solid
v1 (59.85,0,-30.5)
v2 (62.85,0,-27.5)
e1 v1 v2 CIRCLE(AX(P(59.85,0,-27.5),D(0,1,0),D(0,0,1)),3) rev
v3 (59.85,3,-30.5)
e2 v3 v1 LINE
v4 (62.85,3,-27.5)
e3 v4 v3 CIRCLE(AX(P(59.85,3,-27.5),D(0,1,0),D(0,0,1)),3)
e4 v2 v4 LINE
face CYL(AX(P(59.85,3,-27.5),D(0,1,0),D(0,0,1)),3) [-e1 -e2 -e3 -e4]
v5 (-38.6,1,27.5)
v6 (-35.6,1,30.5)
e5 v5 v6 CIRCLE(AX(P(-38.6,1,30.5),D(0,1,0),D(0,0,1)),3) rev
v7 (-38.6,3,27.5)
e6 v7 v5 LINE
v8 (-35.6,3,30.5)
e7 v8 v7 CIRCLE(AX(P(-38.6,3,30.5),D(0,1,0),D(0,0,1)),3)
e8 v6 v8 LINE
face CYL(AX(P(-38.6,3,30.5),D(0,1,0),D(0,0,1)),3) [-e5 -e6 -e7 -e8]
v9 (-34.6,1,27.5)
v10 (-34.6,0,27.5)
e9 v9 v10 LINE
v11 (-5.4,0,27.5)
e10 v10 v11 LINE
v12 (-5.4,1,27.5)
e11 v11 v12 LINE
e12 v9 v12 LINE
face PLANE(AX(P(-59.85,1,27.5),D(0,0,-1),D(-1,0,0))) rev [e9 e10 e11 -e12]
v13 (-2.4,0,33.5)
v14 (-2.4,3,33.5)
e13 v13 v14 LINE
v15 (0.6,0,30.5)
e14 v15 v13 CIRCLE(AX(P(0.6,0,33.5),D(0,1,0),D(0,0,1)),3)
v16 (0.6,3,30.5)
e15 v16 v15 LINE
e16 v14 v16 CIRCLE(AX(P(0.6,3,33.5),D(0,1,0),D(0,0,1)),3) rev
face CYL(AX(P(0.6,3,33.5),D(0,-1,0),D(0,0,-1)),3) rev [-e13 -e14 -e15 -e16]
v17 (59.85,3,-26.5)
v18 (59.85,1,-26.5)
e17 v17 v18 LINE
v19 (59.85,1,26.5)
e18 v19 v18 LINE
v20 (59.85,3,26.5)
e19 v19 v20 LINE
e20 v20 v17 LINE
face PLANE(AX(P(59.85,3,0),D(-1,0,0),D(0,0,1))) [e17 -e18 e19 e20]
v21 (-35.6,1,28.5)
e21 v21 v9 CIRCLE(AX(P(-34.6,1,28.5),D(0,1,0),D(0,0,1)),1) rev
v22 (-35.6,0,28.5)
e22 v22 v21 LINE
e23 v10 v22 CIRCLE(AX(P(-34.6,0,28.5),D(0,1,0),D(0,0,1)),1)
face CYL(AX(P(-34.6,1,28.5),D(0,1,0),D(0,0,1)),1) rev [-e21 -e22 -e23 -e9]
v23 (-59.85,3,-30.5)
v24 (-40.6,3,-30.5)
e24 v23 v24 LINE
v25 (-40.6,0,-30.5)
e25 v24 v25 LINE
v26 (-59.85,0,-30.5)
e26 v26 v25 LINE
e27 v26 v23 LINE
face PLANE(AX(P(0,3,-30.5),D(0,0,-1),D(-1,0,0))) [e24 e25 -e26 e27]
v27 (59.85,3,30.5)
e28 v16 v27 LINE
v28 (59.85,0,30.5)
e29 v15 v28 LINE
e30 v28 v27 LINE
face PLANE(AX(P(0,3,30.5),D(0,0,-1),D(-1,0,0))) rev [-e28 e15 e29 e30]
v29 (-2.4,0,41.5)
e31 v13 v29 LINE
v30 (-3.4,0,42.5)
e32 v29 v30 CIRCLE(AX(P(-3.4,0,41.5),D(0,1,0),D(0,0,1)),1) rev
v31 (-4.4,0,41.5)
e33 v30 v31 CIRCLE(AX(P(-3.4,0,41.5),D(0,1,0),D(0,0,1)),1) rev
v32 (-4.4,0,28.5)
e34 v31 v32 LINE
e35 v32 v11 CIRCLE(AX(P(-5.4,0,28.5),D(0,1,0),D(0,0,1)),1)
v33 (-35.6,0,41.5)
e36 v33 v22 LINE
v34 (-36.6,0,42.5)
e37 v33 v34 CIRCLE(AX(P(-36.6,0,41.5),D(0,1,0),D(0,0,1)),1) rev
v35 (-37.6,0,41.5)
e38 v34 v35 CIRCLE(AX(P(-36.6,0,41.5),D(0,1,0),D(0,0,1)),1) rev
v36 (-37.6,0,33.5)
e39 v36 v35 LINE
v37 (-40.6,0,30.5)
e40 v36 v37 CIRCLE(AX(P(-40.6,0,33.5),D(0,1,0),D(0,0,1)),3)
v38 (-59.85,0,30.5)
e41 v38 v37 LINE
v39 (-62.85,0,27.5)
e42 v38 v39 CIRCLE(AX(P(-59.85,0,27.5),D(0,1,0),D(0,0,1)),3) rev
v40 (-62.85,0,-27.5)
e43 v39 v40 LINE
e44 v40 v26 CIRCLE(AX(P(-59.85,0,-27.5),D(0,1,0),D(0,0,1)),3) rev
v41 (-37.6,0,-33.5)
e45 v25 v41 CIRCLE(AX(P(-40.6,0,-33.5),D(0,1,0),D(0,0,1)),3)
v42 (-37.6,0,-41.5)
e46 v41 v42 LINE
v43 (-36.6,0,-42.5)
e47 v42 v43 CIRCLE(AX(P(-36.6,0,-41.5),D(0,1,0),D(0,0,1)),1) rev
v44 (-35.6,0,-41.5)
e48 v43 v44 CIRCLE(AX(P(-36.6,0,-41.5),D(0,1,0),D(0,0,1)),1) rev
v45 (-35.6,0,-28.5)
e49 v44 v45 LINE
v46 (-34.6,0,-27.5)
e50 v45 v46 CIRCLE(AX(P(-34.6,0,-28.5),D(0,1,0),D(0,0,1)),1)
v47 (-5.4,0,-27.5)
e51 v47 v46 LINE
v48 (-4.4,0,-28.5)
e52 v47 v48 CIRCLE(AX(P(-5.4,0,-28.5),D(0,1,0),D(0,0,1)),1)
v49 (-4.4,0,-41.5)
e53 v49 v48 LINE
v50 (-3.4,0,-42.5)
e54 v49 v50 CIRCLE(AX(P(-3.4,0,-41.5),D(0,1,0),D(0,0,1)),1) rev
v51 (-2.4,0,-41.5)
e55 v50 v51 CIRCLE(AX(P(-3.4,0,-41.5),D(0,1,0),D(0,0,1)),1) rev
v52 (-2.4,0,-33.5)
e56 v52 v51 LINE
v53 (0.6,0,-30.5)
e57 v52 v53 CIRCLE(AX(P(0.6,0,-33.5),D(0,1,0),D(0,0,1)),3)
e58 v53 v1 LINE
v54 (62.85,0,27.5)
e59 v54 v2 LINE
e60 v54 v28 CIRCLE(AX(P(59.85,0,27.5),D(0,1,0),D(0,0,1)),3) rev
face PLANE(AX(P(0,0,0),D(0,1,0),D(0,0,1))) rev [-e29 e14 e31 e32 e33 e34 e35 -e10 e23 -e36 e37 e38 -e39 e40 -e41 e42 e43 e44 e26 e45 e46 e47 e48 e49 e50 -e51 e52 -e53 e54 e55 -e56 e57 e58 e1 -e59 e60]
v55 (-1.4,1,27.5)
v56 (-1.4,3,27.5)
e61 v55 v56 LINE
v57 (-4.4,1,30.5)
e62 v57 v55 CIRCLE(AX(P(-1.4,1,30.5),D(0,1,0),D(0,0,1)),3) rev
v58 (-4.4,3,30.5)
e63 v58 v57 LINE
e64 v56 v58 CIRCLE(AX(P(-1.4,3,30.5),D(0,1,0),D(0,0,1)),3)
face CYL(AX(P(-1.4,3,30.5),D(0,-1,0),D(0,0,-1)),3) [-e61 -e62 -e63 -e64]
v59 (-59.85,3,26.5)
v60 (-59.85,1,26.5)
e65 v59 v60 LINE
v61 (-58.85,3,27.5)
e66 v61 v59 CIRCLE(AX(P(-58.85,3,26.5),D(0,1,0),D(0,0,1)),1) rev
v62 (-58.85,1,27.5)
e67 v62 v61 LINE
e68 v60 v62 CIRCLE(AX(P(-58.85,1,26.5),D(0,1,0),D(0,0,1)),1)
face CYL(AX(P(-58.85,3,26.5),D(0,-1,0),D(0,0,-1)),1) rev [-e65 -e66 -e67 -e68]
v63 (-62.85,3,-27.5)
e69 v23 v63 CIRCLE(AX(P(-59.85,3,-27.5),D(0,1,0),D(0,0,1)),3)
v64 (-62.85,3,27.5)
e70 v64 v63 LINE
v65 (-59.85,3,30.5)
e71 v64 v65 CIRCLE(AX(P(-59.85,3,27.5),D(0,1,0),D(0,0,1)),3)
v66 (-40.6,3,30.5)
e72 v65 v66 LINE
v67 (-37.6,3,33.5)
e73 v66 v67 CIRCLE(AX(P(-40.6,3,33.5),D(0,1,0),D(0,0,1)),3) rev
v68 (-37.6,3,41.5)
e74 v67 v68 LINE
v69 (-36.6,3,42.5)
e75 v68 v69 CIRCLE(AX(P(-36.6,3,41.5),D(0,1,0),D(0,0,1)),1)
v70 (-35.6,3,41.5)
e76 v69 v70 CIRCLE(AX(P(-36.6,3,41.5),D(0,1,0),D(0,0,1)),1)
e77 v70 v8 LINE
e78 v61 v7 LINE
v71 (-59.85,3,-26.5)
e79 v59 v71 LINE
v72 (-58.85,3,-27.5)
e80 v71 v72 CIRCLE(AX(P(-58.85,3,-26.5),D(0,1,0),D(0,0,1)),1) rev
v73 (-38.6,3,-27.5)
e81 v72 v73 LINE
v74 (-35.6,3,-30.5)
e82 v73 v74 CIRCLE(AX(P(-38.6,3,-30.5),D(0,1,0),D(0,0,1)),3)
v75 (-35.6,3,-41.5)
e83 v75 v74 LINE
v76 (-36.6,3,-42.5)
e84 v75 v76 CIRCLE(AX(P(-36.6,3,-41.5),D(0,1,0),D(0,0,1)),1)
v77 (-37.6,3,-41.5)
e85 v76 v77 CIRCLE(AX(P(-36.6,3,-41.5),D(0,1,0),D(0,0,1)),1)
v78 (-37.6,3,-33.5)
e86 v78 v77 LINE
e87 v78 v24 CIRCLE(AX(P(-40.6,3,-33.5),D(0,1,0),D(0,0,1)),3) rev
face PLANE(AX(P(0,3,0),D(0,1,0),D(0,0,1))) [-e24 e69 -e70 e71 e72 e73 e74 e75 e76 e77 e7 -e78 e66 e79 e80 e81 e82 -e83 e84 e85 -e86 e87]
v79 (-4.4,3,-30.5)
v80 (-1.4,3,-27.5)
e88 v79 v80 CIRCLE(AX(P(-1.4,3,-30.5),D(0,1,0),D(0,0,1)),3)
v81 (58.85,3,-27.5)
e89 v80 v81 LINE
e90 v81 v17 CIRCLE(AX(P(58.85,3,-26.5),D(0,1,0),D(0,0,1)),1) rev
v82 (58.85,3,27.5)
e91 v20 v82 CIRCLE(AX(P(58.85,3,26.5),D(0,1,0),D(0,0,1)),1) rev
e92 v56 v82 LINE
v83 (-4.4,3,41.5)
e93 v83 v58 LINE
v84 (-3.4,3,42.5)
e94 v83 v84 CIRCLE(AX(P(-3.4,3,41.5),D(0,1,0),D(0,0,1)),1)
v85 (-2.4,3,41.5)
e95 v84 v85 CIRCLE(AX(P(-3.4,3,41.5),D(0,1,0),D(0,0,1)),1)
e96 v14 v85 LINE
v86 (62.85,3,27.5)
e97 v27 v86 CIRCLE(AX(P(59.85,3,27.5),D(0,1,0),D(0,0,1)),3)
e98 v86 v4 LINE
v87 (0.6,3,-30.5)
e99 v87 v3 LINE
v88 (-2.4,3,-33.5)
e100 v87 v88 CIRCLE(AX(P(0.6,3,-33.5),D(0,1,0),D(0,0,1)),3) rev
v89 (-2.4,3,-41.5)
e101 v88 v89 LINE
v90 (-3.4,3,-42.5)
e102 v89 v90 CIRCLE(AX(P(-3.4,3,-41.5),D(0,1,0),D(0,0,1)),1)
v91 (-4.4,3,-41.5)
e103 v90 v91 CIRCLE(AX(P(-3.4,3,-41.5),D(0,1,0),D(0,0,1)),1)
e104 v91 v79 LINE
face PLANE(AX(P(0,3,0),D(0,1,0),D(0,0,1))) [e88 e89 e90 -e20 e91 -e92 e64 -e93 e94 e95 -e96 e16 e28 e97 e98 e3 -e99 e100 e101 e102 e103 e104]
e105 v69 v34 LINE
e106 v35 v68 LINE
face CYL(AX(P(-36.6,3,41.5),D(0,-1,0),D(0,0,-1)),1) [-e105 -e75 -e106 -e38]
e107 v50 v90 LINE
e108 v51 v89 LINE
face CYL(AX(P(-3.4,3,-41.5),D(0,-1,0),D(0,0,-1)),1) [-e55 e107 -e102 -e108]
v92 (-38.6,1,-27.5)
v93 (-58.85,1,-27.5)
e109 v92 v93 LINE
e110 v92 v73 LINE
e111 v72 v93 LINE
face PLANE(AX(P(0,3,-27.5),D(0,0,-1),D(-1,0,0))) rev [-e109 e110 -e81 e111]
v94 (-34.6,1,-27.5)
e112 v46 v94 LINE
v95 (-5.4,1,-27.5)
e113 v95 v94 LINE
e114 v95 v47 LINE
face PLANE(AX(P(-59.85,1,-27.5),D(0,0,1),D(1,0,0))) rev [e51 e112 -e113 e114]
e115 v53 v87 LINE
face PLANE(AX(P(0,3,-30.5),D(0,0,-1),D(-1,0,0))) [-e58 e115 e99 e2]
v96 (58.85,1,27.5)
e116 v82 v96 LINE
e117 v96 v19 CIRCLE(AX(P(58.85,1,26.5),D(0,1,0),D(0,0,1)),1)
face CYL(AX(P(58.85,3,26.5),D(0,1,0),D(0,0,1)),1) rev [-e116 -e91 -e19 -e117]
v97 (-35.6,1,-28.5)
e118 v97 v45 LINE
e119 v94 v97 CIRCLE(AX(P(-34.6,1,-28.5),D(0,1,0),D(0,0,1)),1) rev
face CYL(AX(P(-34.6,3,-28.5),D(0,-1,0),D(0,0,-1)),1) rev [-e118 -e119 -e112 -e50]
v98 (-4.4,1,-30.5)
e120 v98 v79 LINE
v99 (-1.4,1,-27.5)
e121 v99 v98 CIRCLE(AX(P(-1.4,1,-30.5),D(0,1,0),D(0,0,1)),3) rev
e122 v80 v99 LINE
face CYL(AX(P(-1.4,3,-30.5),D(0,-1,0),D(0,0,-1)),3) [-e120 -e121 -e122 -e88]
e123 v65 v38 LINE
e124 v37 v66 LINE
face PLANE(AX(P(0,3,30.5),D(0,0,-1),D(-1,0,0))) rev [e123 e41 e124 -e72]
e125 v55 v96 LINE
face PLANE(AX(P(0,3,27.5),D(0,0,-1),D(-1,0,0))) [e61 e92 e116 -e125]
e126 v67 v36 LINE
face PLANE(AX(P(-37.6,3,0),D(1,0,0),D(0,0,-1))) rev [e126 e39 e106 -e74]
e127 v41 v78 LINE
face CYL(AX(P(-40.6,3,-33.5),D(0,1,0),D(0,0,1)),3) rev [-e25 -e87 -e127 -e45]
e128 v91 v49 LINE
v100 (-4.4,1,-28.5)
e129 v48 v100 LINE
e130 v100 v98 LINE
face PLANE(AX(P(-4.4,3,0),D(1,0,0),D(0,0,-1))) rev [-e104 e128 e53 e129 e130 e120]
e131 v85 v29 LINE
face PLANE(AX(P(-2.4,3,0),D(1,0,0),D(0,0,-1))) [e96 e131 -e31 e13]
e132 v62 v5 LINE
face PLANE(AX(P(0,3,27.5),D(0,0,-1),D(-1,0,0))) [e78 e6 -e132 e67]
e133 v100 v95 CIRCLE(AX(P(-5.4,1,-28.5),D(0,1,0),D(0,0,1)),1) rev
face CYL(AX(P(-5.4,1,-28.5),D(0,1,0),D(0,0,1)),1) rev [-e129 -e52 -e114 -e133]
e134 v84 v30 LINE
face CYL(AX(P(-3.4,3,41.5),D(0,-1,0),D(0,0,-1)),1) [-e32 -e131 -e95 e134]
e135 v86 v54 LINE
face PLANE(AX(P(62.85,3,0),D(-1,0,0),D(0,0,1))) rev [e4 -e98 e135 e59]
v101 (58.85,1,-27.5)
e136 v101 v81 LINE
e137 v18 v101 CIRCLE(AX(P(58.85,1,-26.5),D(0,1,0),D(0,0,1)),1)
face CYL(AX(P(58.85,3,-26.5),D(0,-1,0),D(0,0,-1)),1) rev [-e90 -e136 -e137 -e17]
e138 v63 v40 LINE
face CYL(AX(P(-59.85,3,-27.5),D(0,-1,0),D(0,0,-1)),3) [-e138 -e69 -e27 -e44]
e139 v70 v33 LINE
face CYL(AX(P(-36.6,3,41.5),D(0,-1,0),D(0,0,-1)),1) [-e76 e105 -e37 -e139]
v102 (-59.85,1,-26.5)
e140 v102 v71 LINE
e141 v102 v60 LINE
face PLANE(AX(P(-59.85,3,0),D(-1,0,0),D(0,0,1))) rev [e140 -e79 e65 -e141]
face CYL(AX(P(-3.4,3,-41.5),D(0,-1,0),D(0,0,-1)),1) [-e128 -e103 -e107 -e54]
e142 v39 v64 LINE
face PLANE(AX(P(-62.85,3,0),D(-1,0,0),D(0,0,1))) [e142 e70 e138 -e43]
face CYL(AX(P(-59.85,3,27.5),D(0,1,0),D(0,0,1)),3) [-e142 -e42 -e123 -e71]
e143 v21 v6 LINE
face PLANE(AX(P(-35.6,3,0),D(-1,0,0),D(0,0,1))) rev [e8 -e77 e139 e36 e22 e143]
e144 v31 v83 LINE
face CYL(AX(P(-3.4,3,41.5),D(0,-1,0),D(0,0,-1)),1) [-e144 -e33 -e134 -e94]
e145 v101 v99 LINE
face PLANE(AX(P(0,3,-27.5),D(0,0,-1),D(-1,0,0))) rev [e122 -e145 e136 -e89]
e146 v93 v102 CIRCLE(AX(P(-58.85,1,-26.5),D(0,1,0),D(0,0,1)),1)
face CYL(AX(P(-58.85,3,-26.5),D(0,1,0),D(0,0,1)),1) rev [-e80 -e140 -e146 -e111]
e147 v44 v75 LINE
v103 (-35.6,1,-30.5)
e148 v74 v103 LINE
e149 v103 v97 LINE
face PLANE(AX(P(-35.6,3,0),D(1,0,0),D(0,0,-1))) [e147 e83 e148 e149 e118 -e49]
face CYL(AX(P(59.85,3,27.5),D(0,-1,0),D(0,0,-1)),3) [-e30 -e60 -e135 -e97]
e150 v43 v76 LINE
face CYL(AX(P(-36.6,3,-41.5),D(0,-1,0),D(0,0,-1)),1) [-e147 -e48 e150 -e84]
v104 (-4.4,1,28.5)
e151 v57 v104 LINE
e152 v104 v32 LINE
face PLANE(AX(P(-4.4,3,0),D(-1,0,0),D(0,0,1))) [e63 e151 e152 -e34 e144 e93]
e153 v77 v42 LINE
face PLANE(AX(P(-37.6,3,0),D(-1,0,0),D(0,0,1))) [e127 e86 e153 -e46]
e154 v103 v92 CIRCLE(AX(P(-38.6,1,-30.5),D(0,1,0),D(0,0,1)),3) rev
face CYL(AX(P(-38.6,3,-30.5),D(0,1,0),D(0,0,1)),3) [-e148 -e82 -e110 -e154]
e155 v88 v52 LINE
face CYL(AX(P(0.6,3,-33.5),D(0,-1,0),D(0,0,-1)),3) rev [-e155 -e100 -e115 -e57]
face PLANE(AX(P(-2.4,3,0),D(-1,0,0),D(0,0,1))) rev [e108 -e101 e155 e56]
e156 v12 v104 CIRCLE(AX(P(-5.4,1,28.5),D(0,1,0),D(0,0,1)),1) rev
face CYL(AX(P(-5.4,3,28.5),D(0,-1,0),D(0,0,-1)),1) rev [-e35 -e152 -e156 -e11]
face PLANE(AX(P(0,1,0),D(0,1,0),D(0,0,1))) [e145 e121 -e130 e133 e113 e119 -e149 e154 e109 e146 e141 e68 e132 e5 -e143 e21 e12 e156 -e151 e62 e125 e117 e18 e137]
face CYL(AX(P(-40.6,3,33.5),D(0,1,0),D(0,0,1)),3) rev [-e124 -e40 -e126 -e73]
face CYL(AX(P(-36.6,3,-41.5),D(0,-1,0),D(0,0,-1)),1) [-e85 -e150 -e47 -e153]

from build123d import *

# Parameters (mm, degrees)
BOSS_EXTRUDE6_DEPTH   = 3
BOSS_EXTRUDE6_2_DEPTH = 3
SKETCH4_W             = 119.7
SKETCH4_H             = 55
BOSS_EXTRUDE7_DEPTH   = 1
FILLET13_R            = 3
FILLET14_R            = 1
FILLET15_R            = 1
FILLET16_R            = 3
FILLET17_R            = 3
FILLET18_R            = 1
FILLET19_R            = 3
FILLET20_R            = 1


with BuildPart() as part:
    # Sketch3 → Boss-Extrude6 (new body)
    with BuildSketch(Plane(origin=(0, 0, 0), x_dir=(1, 0, 0), z_dir=(0, 1, 0))):
        Polygon((-35.6, -27.5), (-59.85, -27.5), (-59.85, 27.5), (-35.6, 27.5), (-35.6, 42.5), (-37.6, 42.5), (-37.6, 30.5), (-62.85, 30.5), (-62.85, -30.5), (-37.6, -30.5), (-37.6, -42.5), (-35.6, -42.5), align=None)
    extrude(amount=BOSS_EXTRUDE6_DEPTH)



with BuildPart() as body_2:
    # Sketch3 → Boss-Extrude6 2 (new body)
    with BuildSketch(Plane(origin=(0, 0, 0), x_dir=(1, 0, 0), z_dir=(0, 1, 0))):
        Polygon((59.85, -27.5), (-4.4, -27.5), (-4.4, -42.5), (-2.4, -42.5), (-2.4, -30.5), (62.85, -30.5), (62.85, 30.5), (-2.4, 30.5), (-2.4, 42.5), (-4.4, 42.5), (-4.4, 27.5), (59.85, 27.5), align=None)
    extrude(amount=BOSS_EXTRUDE6_2_DEPTH)


with BuildPart() as part_1:
    add(part.part)

    add(body_2.part)  # Boss-Extrude7 merges body 2
    # Sketch4 → Boss-Extrude7 (add)
    with BuildSketch(Plane(origin=(0, 0, 0), x_dir=(1, 0, 0), z_dir=(0, 1, 0))):
        Rectangle(SKETCH4_W, SKETCH4_H)
    extrude(amount=BOSS_EXTRUDE7_DEPTH)

    # Fillet13
    fillet13_edges = [part_1.edges().sort_by_distance(p)[0] for p in [
        (-62.85, 1.5, 30.5),
        (-62.85, 1.5, -30.5),
        (62.85, 1.5, 30.5),
        (62.85, 1.5, -30.5),
    ]]
    fillet(fillet13_edges, radius=FILLET13_R)

    # Fillet14
    fillet14_edges = [part_1.edges().sort_by_distance(p)[0] for p in [
        (-59.85, 2, -27.5),
        (-59.85, 2, 27.5),
        (59.85, 2, -27.5),
        (59.85, 2, 27.5),
    ]]
    fillet(fillet14_edges, radius=FILLET14_R)

    # Fillet15
    fillet15_edges = [part_1.edges().sort_by_distance(p)[0] for p in [
        (-2.4, 1.5, 42.5),
        (-4.4, 1.5, 42.5),
        (-35.6, 1.5, 42.5),
        (-37.6, 1.5, 42.5),
        (-35.6, 1.5, -42.5),
        (-37.6, 1.5, -42.5),
        (-2.4, 1.5, -42.5),
        (-4.4, 1.5, -42.5),
    ]]
    fillet(fillet15_edges, radius=FILLET15_R - 0.0001)  # a hair under: the kernel refuses the full size

    # Fillet16
    fillet16_edges = [part_1.edges().sort_by_distance(p)[0] for p in [
        (-37.6, 1.5, -30.5),
        (-37.6, 1.5, 30.5),
        (-2.4, 1.5, 30.5),
        (-2.4, 1.5, -30.5),
    ]]
    fillet(fillet16_edges, radius=FILLET16_R)

    # Fillet17
    fillet17_edges = [part_1.edges().sort_by_distance(p)[0] for p in [
        (-35.6, 2, -27.5),
        (-4.4, 2, -27.5),
    ]]
    fillet(fillet17_edges, radius=FILLET17_R)

    # Fillet18
    fillet18_edges = [part_1.edges().sort_by_distance(p)[0] for p in [
        (-35.6, 0.5, -27.5),
        (-4.4, 0.5, -27.5),
    ]]
    fillet(fillet18_edges, radius=FILLET18_R)

    # Fillet19
    fillet19_edges = [part_1.edges().sort_by_distance(p)[0] for p in [
        (-35.6, 2, 27.5),
        (-4.4, 2, 27.5),
    ]]
    fillet(fillet19_edges, radius=FILLET19_R)

    # Fillet20
    fillet20_edges = [part_1.edges().sort_by_distance(p)[0] for p in [
        (-35.6, 0.5, 27.5),
        (-4.4, 0.5, 27.5),
    ]]
    fillet(fillet20_edges, radius=FILLET20_R)


solid = part_1.part
